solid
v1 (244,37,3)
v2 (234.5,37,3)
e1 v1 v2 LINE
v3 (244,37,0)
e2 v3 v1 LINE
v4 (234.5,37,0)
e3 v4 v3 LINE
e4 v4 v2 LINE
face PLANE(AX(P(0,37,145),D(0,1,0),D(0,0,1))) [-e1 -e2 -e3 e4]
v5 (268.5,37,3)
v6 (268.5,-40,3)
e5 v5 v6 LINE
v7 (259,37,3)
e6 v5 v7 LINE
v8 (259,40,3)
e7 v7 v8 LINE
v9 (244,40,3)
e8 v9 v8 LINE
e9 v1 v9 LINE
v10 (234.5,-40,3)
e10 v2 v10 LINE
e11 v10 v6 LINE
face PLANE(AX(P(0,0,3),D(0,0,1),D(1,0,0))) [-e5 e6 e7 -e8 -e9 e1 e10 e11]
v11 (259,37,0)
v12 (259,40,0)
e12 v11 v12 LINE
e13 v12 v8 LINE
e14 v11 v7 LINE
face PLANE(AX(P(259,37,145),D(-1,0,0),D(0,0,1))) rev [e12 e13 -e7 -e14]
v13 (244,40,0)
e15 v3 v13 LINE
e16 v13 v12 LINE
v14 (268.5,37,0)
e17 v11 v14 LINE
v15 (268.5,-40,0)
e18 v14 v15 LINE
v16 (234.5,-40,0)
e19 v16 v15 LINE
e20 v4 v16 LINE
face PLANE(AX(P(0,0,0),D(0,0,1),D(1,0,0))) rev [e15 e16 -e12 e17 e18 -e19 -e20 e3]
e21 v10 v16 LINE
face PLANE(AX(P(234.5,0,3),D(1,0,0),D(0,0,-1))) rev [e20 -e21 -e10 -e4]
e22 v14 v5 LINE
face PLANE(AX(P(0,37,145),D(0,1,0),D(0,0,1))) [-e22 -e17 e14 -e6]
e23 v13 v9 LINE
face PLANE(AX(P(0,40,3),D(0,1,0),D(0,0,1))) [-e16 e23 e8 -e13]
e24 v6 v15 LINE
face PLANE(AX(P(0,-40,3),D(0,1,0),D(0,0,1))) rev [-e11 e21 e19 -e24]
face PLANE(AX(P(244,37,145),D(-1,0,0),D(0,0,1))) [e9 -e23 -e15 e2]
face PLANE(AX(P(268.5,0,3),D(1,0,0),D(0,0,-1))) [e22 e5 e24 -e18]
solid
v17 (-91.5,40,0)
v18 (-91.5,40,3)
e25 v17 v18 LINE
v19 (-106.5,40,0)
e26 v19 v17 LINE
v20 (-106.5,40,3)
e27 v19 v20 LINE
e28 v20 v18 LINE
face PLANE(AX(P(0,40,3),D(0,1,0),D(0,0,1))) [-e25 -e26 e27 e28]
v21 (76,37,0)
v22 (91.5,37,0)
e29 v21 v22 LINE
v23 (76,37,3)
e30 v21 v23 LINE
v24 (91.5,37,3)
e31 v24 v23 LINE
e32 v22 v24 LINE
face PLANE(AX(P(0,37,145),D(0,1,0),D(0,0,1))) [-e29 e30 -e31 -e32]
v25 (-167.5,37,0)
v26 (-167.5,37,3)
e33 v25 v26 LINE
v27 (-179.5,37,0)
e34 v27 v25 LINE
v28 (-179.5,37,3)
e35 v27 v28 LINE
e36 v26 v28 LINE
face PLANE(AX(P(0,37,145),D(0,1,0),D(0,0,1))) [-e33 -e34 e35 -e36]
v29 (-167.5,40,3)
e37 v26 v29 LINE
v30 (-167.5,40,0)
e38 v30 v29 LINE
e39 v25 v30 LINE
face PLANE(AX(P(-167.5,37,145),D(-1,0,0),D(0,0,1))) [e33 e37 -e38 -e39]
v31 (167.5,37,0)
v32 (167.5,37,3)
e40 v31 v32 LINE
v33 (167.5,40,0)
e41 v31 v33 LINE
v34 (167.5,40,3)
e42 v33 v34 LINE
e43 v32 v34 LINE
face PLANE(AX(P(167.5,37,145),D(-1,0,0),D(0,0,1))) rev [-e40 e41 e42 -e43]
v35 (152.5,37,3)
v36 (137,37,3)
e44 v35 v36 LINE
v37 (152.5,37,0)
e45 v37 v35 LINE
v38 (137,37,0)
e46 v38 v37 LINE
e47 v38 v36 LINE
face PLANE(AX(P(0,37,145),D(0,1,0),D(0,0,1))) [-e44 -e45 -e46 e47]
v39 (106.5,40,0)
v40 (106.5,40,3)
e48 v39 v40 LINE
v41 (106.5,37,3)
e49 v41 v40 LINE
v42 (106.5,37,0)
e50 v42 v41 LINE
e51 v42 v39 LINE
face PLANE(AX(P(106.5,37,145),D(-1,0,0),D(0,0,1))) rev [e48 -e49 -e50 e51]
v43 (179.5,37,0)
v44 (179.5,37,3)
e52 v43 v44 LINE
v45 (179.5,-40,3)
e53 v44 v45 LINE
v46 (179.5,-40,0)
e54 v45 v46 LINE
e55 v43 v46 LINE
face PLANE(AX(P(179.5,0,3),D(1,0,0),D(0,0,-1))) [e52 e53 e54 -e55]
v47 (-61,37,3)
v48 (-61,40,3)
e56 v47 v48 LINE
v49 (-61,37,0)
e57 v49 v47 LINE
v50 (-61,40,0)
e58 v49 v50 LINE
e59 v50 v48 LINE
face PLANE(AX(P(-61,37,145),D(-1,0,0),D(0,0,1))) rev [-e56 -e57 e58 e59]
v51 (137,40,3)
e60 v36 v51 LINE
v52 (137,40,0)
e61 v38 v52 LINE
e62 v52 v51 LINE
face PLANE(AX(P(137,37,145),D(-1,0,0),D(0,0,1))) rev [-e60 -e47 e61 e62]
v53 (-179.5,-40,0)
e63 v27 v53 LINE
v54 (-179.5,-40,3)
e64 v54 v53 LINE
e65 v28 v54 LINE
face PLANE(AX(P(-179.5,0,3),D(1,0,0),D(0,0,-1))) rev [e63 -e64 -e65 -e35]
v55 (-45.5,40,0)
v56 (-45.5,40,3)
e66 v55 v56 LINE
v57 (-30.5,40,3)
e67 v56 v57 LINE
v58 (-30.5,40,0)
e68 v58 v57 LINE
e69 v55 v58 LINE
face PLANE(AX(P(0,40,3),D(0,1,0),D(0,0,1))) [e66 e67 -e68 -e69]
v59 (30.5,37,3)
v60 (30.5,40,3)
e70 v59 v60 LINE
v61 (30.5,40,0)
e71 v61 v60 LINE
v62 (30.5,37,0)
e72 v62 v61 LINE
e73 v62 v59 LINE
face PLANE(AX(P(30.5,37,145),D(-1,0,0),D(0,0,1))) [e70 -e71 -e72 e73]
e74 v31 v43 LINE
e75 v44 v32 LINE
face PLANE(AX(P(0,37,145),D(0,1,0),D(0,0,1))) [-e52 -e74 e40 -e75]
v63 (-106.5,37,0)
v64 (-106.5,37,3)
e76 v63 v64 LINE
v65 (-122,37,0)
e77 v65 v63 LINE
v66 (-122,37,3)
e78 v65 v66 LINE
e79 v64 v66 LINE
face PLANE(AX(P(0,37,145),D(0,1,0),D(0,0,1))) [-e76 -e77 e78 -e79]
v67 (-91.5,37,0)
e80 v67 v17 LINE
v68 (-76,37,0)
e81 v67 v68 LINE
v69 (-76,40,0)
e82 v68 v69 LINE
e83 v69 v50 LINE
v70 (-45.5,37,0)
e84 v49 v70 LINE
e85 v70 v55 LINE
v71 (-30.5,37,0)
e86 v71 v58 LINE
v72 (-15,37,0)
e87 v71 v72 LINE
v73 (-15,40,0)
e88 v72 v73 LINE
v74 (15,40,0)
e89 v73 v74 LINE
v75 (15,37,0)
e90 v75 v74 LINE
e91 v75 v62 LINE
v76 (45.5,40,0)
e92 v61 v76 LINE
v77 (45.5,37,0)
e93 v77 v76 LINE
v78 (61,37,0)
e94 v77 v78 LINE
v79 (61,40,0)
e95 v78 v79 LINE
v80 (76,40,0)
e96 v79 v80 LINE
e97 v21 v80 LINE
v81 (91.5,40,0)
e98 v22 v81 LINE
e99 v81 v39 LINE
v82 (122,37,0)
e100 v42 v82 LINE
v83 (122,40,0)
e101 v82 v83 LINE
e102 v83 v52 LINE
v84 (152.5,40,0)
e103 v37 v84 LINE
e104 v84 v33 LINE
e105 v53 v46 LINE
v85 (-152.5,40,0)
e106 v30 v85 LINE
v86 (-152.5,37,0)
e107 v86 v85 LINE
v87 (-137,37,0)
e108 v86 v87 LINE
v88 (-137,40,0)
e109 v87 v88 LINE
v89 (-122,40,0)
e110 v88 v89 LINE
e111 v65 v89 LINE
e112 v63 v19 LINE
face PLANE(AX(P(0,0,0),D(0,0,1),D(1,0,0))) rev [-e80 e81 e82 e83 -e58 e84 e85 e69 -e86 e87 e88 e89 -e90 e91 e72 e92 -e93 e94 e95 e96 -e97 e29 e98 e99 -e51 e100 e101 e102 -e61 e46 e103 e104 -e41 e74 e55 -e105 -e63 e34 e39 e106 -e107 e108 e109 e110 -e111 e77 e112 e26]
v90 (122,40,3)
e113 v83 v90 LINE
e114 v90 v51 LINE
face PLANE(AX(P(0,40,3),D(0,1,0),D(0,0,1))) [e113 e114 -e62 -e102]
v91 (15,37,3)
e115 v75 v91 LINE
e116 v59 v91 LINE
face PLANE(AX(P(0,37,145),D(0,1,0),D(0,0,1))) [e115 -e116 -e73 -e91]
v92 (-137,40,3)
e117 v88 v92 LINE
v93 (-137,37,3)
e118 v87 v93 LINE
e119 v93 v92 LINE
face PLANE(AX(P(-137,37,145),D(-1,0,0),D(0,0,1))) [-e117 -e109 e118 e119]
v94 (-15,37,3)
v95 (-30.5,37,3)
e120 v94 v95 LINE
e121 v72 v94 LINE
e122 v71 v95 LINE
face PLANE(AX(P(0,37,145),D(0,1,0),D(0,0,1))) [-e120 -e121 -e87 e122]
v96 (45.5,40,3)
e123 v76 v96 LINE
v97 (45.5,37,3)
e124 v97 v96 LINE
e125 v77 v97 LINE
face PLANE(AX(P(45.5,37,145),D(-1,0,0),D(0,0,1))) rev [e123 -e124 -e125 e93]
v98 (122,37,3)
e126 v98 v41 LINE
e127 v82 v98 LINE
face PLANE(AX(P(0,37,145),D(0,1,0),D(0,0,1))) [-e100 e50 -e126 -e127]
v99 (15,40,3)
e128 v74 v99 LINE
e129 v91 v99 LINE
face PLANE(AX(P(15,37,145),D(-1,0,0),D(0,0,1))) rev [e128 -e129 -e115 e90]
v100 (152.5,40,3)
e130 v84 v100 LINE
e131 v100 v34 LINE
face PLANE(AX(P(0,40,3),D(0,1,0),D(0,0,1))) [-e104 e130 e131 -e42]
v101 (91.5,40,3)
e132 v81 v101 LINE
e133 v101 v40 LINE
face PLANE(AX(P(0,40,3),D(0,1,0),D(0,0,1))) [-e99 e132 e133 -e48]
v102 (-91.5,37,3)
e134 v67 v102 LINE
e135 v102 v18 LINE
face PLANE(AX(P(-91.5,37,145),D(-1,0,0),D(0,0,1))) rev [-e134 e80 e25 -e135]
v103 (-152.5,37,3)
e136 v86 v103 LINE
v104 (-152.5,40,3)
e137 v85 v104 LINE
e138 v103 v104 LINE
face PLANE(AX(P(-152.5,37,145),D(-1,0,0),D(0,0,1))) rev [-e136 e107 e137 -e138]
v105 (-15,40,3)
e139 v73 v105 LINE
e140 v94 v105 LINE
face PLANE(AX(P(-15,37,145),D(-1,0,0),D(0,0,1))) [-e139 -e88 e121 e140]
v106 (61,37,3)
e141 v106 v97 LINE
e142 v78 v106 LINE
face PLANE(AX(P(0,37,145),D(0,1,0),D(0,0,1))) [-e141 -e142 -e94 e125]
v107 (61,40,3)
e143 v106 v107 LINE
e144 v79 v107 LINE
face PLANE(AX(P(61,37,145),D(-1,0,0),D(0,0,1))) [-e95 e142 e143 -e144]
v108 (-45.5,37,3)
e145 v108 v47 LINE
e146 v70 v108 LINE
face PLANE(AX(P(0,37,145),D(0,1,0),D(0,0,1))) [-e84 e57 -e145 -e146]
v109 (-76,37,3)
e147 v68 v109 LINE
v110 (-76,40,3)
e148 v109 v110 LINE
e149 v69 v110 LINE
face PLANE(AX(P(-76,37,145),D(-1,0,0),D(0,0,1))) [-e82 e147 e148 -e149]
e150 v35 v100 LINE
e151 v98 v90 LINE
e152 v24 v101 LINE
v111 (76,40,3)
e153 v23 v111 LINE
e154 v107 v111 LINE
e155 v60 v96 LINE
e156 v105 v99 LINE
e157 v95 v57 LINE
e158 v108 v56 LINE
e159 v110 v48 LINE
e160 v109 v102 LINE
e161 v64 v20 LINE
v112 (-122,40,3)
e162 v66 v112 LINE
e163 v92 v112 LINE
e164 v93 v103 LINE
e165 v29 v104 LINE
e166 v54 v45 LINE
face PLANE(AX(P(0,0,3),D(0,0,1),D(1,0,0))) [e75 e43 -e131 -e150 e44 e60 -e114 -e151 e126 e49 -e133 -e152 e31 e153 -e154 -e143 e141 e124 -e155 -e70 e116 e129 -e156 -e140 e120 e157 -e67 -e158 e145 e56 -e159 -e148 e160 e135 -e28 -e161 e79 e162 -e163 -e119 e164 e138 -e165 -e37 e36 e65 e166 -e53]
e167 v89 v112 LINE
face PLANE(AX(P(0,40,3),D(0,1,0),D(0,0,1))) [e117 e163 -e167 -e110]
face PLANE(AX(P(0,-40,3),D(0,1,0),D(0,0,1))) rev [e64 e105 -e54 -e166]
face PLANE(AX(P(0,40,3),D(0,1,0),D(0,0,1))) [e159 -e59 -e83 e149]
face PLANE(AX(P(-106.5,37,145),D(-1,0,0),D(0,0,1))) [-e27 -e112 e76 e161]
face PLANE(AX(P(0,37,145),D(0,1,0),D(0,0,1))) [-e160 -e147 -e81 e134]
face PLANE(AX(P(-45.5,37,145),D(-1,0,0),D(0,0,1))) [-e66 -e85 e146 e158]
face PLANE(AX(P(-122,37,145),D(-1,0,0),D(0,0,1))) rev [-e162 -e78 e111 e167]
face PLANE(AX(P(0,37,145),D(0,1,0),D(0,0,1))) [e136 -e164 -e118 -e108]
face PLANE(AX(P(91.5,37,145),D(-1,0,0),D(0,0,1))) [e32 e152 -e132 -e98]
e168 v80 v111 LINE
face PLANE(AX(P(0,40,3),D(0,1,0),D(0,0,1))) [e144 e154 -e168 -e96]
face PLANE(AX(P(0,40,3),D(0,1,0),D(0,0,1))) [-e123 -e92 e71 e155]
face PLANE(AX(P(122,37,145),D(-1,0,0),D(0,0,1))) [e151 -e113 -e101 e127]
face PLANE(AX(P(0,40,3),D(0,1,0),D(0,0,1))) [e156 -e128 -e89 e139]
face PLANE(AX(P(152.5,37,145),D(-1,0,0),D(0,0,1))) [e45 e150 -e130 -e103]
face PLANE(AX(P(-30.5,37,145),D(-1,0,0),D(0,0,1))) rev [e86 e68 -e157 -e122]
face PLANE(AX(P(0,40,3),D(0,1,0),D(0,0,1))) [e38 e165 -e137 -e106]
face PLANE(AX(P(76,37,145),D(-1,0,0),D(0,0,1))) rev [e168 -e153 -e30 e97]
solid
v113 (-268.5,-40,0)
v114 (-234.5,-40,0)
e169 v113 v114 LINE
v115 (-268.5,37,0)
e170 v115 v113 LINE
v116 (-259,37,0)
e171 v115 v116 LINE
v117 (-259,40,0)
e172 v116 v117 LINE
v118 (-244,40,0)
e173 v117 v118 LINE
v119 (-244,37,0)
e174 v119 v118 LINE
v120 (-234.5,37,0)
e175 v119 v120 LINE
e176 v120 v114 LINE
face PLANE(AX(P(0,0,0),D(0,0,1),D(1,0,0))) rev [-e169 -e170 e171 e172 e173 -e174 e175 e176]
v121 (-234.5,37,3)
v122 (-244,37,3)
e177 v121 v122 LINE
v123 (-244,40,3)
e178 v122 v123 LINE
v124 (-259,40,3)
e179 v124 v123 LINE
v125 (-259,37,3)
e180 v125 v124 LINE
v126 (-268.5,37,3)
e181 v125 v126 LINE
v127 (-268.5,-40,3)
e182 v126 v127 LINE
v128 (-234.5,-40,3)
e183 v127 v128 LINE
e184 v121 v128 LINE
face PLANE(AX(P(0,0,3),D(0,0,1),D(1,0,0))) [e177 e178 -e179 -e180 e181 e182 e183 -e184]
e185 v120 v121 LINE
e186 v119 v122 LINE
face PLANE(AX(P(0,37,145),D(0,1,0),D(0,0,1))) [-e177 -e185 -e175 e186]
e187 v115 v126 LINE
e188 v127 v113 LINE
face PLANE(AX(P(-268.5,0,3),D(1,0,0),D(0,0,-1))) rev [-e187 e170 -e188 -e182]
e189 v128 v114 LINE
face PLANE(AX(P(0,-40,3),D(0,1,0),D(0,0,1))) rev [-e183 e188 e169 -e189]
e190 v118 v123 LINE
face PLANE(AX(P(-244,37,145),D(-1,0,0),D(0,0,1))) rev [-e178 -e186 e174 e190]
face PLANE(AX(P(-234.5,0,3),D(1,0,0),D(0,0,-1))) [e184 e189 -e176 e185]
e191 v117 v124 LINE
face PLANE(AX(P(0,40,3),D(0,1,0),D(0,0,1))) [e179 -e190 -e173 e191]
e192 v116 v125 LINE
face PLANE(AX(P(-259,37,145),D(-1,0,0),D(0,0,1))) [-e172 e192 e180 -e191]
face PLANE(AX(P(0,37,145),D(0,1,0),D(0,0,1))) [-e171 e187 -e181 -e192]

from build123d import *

# Parameters (mm, degrees)
SKETCH1_W             = 34
SKETCH1_H             = 80
BOSS_EXTRUDE1_DEPTH   = 3
SKETCH1_W_2           = 359
BOSS_EXTRUDE1_2_DEPTH = 3
BOSS_EXTRUDE1_3_DEPTH = 3
CAVITY1_START         = 37
CAVITY1_OUTLINE_W     = 9.5
CAVITY1_OUTLINE_H     = 3
CAVITY1_OUTLINE_W_2   = 12
CAVITY1_OUTLINE_W_3   = 15.5
CAVITY1_DEPTH         = 3


# Read off the part's stored shape, not the designer's step: Cavity1
with BuildPart() as part:
    # Sketch1 → Boss-Extrude1 (new body)
    with BuildSketch(Plane.XY):
        with Locations((-251.5, 0)):
            Rectangle(SKETCH1_W, SKETCH1_H)
    extrude(amount=BOSS_EXTRUDE1_DEPTH)


with BuildPart() as body_2:
    # Sketch1 → Boss-Extrude1 2 (new body)
    with BuildSketch(Plane.XY):
        Rectangle(SKETCH1_W_2, SKETCH1_H)
    extrude(amount=BOSS_EXTRUDE1_2_DEPTH)


with BuildPart() as body_3:
    # Sketch1 → Boss-Extrude1 3 (new body)
    with BuildSketch(Plane.XY):
        with Locations((251.5, 0)):
            Rectangle(SKETCH1_W, SKETCH1_H)
    extrude(amount=BOSS_EXTRUDE1_3_DEPTH)


with BuildPart() as cavity1_tool:
    # Cavity1 outline → Cavity1 (new body)
    with BuildSketch(Plane(origin=(0, 0, 0), x_dir=(1, 0, 0), z_dir=(0, 1, 0)).offset(CAVITY1_START)):
        with Locations((239.25, -1.5)):
            Rectangle(CAVITY1_OUTLINE_W, CAVITY1_OUTLINE_H)
        with Locations((263.75, -1.5)):
            Rectangle(CAVITY1_OUTLINE_W, CAVITY1_OUTLINE_H)
        with Locations((-173.5, -1.5)):
            Rectangle(CAVITY1_OUTLINE_W_2, CAVITY1_OUTLINE_H)
        with Locations((-144.75, -1.5)):
            Rectangle(CAVITY1_OUTLINE_W_3, CAVITY1_OUTLINE_H)
        with Locations((-114.25, -1.5)):
            Rectangle(CAVITY1_OUTLINE_W_3, CAVITY1_OUTLINE_H)
        with Locations((-83.75, -1.5)):
            Rectangle(CAVITY1_OUTLINE_W_3, CAVITY1_OUTLINE_H)
        with Locations((-53.25, -1.5)):
            Rectangle(CAVITY1_OUTLINE_W_3, CAVITY1_OUTLINE_H)
        with Locations((-22.75, -1.5)):
            Rectangle(CAVITY1_OUTLINE_W_3, CAVITY1_OUTLINE_H)
        with Locations((22.75, -1.5)):
            Rectangle(CAVITY1_OUTLINE_W_3, CAVITY1_OUTLINE_H)
        with Locations((53.25, -1.5)):
            Rectangle(CAVITY1_OUTLINE_W_3, CAVITY1_OUTLINE_H)
        with Locations((83.75, -1.5)):
            Rectangle(CAVITY1_OUTLINE_W_3, CAVITY1_OUTLINE_H)
        with Locations((114.25, -1.5)):
            Rectangle(CAVITY1_OUTLINE_W_3, CAVITY1_OUTLINE_H)
        with Locations((144.75, -1.5)):
            Rectangle(CAVITY1_OUTLINE_W_3, CAVITY1_OUTLINE_H)
        with Locations((173.5, -1.5)):
            Rectangle(CAVITY1_OUTLINE_W_2, CAVITY1_OUTLINE_H)
        with Locations((-263.75, -1.5)):
            Rectangle(CAVITY1_OUTLINE_W, CAVITY1_OUTLINE_H)
        with Locations((-239.25, -1.5)):
            Rectangle(CAVITY1_OUTLINE_W, CAVITY1_OUTLINE_H)
    extrude(amount=CAVITY1_DEPTH)


with BuildPart() as part_1:
    add(part.part)

    # Cavity1: cut by cavity1_tool
    add(cavity1_tool.part, mode=Mode.SUBTRACT)


with BuildPart() as body_2_1:
    add(body_2.part)

    # Cavity1: cut by cavity1_tool
    add(cavity1_tool.part, mode=Mode.SUBTRACT)


with BuildPart() as body_3_1:
    add(body_3.part)

    # Cavity1: cut by cavity1_tool
    add(cavity1_tool.part, mode=Mode.SUBTRACT)


solid = Compound([part_1.part, body_2_1.part, body_3_1.part])
